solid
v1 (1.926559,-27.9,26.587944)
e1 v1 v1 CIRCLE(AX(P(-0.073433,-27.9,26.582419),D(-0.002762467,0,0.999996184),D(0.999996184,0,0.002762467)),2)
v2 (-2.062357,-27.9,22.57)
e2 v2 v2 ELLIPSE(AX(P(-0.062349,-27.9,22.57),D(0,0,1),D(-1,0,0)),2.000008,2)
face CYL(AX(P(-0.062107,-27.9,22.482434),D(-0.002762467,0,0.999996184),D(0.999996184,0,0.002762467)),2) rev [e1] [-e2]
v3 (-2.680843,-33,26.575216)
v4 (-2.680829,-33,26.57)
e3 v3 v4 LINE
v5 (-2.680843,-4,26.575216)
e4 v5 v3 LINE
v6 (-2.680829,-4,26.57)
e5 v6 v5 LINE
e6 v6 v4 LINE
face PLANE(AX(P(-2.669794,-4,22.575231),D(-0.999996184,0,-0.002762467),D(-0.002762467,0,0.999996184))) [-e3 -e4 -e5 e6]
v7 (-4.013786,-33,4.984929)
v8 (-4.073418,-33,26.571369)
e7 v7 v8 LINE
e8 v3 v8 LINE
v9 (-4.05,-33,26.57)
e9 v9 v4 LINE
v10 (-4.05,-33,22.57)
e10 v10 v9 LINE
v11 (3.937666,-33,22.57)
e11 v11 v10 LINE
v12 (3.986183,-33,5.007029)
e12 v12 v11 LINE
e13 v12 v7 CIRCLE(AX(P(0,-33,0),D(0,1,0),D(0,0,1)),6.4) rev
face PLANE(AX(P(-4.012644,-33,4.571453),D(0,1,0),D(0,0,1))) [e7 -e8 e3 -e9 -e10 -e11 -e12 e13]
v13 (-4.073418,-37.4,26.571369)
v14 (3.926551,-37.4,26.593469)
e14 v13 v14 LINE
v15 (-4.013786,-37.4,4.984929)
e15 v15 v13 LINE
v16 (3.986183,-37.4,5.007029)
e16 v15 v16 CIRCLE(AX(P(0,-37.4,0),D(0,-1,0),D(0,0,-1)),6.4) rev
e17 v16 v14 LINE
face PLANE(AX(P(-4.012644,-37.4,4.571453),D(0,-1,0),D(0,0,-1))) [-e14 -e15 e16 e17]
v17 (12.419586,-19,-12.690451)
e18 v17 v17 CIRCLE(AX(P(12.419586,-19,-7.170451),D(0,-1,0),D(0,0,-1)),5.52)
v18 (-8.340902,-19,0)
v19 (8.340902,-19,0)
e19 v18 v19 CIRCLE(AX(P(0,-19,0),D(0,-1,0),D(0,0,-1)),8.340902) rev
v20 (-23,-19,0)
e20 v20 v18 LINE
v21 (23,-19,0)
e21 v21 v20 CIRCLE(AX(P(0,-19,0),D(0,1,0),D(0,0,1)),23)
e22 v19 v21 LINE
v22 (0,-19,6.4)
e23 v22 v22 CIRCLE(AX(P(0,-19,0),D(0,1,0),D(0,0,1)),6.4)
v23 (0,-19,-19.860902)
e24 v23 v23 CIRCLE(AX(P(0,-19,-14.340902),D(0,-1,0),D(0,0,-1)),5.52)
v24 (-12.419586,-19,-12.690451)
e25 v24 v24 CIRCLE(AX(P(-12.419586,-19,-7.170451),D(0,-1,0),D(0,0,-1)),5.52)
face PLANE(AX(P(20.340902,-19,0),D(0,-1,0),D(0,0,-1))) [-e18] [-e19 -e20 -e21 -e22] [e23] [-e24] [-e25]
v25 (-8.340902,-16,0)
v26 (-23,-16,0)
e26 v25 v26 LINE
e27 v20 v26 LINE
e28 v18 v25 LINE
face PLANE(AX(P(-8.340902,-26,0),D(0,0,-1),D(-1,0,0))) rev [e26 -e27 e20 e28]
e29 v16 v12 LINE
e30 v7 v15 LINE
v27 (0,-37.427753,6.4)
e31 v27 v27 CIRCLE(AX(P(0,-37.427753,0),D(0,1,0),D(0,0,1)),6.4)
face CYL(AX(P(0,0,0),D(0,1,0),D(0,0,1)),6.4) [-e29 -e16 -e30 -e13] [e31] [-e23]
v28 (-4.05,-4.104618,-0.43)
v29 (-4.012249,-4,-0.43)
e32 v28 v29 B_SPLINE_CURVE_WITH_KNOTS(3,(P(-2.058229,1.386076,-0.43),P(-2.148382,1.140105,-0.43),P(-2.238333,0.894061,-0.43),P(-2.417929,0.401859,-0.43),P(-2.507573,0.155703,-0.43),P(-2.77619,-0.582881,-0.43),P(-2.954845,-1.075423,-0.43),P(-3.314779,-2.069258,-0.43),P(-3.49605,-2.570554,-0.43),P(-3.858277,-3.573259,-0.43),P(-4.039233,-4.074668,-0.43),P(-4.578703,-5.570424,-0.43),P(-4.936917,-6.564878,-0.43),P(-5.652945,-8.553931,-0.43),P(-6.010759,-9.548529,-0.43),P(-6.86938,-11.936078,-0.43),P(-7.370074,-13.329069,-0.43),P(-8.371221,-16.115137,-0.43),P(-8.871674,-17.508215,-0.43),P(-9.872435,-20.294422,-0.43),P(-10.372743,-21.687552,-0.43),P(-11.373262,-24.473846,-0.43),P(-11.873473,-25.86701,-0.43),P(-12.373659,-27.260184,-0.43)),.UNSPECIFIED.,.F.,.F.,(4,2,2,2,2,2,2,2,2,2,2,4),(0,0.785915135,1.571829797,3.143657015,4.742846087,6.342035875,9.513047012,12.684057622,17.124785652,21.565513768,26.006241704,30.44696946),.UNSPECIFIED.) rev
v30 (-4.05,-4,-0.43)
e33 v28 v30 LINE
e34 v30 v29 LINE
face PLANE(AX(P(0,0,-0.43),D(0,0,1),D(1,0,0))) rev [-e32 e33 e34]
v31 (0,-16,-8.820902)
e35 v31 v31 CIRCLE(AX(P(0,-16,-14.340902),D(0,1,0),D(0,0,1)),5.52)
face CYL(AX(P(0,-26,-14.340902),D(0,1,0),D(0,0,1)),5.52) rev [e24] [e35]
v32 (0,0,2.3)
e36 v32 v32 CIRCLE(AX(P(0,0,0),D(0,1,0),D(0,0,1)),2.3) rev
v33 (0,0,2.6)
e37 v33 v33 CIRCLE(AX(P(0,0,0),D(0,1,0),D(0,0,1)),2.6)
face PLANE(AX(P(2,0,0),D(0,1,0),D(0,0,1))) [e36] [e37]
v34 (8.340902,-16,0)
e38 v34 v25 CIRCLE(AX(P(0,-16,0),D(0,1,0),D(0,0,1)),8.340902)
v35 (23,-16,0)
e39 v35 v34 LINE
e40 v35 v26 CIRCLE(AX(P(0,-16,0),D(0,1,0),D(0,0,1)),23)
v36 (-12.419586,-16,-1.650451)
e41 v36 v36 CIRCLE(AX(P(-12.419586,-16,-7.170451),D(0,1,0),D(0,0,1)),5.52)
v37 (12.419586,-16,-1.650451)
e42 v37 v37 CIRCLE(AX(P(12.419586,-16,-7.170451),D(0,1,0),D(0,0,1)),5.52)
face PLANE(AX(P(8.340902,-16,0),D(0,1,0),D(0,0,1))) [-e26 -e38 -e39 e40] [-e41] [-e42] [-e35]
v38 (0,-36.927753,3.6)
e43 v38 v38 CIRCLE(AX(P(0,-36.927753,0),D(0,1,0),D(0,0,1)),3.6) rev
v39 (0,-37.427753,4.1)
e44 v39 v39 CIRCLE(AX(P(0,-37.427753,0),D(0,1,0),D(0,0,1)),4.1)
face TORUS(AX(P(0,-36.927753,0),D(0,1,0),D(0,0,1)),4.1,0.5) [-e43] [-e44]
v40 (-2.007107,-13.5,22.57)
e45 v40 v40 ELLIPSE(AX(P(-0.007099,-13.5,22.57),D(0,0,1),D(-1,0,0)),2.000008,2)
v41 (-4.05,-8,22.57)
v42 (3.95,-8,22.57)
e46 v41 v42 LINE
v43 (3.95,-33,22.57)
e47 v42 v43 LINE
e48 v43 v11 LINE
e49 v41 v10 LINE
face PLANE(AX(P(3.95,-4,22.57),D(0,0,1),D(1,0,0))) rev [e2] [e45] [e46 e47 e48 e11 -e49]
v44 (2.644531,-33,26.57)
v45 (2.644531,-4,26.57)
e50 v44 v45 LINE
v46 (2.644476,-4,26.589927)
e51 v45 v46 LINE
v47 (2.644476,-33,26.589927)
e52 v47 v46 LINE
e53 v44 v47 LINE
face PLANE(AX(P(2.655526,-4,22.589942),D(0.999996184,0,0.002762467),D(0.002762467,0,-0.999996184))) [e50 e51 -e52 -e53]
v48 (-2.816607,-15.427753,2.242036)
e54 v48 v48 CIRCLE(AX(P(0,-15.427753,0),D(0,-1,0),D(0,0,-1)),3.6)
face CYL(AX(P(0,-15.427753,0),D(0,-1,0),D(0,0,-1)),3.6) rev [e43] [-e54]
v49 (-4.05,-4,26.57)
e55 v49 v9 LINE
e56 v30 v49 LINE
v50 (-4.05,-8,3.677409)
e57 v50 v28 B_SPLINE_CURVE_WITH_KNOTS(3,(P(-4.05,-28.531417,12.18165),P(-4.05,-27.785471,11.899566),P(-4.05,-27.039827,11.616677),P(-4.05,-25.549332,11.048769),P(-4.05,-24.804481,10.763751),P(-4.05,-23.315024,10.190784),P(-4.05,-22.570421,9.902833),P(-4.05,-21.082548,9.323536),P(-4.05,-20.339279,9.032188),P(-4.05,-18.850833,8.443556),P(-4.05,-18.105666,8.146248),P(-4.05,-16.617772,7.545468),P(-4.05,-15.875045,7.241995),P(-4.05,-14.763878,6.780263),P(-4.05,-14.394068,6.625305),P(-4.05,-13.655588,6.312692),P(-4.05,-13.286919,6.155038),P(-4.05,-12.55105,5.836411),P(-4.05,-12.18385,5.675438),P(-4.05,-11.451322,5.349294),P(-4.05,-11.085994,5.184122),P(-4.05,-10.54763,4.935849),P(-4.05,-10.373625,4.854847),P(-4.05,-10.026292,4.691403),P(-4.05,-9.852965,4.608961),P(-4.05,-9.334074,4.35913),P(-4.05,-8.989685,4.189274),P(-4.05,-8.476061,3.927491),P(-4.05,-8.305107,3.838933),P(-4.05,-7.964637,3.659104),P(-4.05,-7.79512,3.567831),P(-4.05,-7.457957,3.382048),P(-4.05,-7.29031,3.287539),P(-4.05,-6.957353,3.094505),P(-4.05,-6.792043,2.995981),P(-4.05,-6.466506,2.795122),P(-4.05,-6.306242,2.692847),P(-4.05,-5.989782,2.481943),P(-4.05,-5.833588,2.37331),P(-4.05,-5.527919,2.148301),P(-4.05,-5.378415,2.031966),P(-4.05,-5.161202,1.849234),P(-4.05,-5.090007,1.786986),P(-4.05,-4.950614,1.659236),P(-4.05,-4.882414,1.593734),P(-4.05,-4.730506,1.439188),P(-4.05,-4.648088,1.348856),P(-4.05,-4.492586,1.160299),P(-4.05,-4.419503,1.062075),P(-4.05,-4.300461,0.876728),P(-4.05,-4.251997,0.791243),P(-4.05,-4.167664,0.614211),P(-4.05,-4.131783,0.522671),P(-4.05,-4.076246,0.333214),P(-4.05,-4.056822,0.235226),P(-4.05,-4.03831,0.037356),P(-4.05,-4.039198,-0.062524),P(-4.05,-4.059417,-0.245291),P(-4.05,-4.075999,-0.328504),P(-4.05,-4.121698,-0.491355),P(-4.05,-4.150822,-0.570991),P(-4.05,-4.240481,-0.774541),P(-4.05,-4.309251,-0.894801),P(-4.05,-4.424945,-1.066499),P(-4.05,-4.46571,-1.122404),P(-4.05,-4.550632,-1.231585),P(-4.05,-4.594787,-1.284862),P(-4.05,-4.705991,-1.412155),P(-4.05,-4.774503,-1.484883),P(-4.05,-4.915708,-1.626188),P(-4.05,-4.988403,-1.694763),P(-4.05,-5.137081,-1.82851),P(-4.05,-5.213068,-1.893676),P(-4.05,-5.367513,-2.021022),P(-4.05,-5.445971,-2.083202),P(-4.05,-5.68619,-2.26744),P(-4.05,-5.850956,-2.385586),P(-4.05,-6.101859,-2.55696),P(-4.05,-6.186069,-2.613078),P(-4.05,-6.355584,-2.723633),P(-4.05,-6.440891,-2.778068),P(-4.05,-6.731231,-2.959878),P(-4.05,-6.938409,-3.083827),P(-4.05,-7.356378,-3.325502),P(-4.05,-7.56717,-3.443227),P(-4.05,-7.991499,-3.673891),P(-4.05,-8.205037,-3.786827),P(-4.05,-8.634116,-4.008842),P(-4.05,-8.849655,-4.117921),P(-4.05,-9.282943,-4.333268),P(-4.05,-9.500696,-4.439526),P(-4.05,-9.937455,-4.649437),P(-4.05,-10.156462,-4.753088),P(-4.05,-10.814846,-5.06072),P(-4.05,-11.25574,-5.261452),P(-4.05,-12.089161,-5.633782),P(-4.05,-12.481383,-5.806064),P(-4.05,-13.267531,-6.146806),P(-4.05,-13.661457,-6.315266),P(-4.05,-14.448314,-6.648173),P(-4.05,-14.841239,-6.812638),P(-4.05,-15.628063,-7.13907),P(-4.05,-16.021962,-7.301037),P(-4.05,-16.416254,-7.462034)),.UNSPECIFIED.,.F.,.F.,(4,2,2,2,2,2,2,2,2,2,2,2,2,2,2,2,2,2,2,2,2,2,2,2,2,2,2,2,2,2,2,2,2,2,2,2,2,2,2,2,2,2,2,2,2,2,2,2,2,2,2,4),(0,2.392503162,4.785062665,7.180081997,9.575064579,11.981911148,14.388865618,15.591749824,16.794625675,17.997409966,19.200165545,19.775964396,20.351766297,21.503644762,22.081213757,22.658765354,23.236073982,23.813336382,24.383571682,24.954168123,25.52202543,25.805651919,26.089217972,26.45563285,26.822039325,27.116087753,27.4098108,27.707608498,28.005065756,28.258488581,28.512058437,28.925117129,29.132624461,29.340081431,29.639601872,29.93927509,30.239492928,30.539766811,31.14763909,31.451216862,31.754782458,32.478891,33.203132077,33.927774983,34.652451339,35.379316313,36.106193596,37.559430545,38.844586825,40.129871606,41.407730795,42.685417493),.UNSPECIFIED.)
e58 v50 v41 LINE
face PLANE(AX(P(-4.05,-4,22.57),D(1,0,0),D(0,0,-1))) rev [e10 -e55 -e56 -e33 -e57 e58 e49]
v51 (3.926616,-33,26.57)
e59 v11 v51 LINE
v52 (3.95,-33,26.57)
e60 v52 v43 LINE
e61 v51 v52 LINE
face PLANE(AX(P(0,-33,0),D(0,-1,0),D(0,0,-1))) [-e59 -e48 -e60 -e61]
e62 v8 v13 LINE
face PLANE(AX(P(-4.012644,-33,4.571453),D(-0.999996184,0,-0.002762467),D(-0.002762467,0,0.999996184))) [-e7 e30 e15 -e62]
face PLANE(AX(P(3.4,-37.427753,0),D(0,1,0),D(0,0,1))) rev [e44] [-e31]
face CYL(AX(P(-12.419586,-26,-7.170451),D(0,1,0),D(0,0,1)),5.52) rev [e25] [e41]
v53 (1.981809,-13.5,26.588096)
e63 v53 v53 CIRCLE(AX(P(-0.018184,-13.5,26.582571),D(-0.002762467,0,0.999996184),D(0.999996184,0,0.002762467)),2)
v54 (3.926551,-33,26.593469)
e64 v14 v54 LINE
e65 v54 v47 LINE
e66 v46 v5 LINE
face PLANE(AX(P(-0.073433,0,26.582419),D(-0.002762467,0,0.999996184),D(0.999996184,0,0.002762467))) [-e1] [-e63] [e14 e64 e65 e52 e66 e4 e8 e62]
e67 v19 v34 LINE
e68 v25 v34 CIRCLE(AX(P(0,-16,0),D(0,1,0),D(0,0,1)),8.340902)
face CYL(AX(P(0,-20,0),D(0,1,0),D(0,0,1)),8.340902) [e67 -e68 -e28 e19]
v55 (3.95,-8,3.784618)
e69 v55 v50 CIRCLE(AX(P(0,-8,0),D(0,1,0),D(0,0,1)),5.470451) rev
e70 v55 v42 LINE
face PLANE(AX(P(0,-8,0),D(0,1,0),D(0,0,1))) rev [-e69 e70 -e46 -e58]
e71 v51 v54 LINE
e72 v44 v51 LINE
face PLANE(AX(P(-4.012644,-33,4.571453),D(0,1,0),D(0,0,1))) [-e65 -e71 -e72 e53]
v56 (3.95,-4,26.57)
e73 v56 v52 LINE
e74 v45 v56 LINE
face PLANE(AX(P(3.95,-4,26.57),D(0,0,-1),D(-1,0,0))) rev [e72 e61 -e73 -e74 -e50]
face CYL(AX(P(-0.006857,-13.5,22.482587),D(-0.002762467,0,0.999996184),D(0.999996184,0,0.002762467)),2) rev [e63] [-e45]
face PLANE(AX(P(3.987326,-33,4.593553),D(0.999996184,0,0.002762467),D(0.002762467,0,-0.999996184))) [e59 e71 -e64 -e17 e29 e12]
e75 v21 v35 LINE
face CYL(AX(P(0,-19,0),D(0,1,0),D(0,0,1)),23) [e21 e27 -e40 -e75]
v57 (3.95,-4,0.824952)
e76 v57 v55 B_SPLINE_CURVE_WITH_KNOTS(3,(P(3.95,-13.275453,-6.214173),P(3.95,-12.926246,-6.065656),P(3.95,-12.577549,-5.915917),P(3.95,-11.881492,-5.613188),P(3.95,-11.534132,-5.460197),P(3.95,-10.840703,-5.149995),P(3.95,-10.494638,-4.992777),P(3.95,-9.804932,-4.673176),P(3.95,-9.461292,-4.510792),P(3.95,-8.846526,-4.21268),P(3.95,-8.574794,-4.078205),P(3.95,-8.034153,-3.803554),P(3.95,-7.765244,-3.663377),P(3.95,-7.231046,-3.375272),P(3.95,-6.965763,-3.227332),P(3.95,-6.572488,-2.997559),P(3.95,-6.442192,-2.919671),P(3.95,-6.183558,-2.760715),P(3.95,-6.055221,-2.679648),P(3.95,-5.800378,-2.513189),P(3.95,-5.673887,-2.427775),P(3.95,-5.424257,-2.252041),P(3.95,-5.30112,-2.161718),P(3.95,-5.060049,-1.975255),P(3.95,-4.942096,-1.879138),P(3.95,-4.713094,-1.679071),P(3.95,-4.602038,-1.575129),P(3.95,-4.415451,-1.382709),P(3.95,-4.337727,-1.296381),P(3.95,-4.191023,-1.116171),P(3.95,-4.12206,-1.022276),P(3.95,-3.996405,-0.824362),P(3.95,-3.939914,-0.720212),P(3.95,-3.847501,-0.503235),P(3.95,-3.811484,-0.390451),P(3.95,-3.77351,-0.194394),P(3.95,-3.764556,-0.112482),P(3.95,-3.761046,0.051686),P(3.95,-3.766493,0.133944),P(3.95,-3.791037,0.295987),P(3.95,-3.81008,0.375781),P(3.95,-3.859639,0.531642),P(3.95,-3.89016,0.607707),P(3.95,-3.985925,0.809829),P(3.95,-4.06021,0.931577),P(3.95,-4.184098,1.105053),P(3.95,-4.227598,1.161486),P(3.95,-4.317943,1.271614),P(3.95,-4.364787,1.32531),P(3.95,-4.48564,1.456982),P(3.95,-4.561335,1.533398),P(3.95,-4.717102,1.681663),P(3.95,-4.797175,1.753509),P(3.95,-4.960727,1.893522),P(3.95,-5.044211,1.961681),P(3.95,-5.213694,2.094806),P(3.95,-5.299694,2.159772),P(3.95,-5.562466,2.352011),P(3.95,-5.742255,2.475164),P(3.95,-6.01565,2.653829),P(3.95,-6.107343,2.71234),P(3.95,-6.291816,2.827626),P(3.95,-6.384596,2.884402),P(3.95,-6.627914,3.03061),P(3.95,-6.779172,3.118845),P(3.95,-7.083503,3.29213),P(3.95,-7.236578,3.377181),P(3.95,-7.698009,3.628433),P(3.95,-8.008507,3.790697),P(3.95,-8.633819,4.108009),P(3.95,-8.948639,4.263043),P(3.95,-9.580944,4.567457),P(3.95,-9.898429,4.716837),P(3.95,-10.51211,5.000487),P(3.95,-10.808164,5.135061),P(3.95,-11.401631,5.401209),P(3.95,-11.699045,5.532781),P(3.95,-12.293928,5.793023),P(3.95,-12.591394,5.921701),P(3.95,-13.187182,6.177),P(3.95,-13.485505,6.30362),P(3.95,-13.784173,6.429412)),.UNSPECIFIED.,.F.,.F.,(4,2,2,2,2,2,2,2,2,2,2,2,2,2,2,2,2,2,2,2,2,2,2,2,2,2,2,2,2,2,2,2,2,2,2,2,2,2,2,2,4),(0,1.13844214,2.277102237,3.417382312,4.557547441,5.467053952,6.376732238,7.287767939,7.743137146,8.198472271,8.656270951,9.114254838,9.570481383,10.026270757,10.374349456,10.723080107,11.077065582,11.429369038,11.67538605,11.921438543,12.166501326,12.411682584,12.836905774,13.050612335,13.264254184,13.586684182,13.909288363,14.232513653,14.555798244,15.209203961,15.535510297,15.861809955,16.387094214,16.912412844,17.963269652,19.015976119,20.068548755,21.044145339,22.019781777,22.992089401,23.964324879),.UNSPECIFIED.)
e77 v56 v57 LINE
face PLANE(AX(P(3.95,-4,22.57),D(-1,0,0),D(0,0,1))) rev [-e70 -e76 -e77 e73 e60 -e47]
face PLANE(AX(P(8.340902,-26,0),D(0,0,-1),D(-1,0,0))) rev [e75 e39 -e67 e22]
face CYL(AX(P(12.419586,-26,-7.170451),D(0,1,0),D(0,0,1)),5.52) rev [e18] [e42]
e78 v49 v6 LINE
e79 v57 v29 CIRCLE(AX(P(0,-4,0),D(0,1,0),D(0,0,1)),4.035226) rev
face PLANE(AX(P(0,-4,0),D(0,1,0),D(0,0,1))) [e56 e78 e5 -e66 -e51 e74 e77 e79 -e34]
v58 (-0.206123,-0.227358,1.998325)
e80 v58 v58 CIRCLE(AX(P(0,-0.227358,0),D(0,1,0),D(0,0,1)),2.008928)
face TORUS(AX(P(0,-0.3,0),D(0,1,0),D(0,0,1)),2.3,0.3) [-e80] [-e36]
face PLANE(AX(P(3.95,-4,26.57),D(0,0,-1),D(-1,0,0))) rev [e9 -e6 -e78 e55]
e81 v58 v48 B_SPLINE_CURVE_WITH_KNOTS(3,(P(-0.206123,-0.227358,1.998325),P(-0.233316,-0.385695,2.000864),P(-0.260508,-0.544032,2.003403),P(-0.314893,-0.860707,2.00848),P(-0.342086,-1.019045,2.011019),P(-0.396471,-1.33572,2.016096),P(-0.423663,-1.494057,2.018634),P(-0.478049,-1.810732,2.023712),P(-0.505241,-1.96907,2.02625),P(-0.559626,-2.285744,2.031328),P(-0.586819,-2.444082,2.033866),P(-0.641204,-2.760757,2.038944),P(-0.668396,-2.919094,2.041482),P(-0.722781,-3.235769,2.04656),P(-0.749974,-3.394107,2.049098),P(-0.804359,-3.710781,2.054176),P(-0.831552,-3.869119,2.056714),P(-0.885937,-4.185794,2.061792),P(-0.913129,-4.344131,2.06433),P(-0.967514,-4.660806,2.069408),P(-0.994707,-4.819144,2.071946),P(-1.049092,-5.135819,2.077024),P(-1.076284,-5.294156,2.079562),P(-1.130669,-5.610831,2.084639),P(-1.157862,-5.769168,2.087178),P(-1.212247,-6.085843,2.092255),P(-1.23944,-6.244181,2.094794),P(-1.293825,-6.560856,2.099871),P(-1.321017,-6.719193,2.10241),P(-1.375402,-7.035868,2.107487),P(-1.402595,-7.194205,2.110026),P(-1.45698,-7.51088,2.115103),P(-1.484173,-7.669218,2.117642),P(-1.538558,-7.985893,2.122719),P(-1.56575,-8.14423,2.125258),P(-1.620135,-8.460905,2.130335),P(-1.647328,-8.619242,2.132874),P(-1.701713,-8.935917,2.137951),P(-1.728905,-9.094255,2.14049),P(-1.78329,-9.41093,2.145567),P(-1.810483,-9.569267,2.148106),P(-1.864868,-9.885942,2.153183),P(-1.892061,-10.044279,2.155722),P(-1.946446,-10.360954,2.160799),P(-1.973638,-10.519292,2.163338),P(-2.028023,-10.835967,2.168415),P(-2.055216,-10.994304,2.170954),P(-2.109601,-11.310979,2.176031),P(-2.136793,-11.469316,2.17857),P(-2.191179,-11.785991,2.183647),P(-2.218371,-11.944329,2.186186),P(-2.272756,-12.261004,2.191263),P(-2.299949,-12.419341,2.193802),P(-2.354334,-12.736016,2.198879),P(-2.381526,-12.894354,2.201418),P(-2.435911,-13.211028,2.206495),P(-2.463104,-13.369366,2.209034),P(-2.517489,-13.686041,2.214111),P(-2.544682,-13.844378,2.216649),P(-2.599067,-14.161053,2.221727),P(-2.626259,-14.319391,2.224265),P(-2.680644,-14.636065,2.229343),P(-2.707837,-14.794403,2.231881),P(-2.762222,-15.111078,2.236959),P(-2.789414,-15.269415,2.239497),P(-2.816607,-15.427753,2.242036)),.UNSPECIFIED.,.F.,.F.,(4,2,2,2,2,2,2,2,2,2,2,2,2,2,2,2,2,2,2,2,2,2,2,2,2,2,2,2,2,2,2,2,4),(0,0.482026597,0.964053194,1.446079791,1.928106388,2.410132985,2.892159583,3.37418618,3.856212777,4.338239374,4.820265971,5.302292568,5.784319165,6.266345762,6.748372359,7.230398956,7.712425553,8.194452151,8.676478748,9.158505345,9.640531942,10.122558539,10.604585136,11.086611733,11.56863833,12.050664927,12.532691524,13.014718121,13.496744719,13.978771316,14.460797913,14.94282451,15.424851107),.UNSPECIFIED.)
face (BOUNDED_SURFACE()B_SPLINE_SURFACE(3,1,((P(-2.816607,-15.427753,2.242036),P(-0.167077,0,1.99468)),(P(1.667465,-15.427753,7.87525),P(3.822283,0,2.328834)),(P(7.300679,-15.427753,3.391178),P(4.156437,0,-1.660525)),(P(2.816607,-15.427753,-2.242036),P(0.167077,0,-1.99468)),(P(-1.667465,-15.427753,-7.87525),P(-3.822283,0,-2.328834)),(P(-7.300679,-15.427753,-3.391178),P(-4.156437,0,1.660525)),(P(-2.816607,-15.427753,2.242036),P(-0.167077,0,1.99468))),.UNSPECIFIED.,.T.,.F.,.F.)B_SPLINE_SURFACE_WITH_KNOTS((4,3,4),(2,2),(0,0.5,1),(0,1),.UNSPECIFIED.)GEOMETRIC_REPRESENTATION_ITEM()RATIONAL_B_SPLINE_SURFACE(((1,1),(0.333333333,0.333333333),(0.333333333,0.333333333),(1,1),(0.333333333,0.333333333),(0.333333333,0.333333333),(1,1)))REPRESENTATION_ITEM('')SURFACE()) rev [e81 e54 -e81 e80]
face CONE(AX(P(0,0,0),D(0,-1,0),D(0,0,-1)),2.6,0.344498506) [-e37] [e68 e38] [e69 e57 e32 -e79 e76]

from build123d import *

# Parameters (mm, degrees)
FILLET1_R                 = 0.3
CUT_EXTRUDE1_DEPTH        = 1
CUT_EXTRUDE1_DEPTH_BACK   = 22
SKETCH3_R                 = 3.6
FILLET2_R                 = 0.5
FILLET3_R                 = 0.5
SKETCH11_R                = 5.52
CUT_EXTRUDE3_DEPTH        = 10
CUT_EXTRUDE4_START        = -10
CUT_EXTRUDE4_DEPTH        = 10
BOSS_EXTRUDE1_START       = -3
BOSS_EXTRUDE1_DEPTH       = 3
BOSS_EXTRUDE4_START       = -3
BOSS_EXTRUDE4_DEPTH       = 3
CUT_EXTRUDE5_DEPTH        = 4
SKETCH22_W                = 4
SKETCH22_H                = 3
BOSS_EXTRUDE6_DEPTH       = 15
CUT_EXTRUDE6_START        = 21
SKETCH25_R                = 3.6
CUT_EXTRUDE6_DEPTH        = 21
BOSS_EXTRUDE7_DEPTH       = 3
BOSS_EXTRUDE7_DEPTH_BACK  = 0.5
SKETCH26_W                = 5
SKETCH26_H                = 24
SKETCH27_R                = 1.5
CUT_EXTRUDE8_DEPTH        = 3.5
CUT_EXTRUDE9_DEPTH        = 25
BOSS_EXTRUDE8_DEPTH       = 4
BOSS_EXTRUDE13_DEPTH      = 5.325316
BOSS_EXTRUDE14_DEPTH      = 2
BOSS_EXTRUDE14_DEPTH_BACK = 2
SKETCH44_W                = 5.325340097
SKETCH44_H                = 33.353922233
SKETCH45_W                = 8
SKETCH45_H                = 4.4
BOSS_EXTRUDE15_DEPTH      = 22
SKETCH47_W                = 8
SKETCH47_H                = 4
BOSS_EXTRUDE16_DEPTH      = 29
SKETCH48_W                = 8
SKETCH48_H                = 4
BOSS_EXTRUDE17_DEPTH      = 23
SKETCH52_R                = 2
CUT_EXTRUDE10_DEPTH       = 4.1


with BuildPart() as part:
    # Sketch2 → Revolve1 (revolve)
    with BuildSketch(Plane.XY, mode=Mode.PRIVATE) as revolve1_sk:
        Polygon((2, 0), (2.6, 0), (8.340902118, -16), (20.340902118, -16), (20.340902118, -19), (6.4, -19), (6.4, -37.427752697), (3.4, -37.427752697), (3.4, -16), (2, -16), align=None)
    revolve(revolve1_sk.sketch.rotate(Axis((0, 0, 0), (0, -1, 0)), 90), axis=Axis((0, 0, 0), (0, -1, 0)))

    # Fillet1
    fillet1_edges = [part.edges().sort_by_distance(p)[0] for p in [
        (0, 0, -2),
    ]]
    fillet(fillet1_edges, radius=FILLET1_R)

    # Sketch3 → Cut-Extrude1 (cut, two sides: drawn at the far end of the back side and taken through both)
    with BuildSketch(Plane.XZ.offset(37.427752697).offset(-CUT_EXTRUDE1_DEPTH_BACK)):
        with Locations(Location((0, 0, 0), (0, 0, 270))):
            Circle(SKETCH3_R)
    extrude(amount=CUT_EXTRUDE1_DEPTH + CUT_EXTRUDE1_DEPTH_BACK, mode=Mode.SUBTRACT)

    # Fillet2
    fillet2_edges = [part.edges().sort_by_distance(p)[0] for p in [
        (0, -15.427752697, -2),
    ]]
    fillet(fillet2_edges, radius=FILLET2_R)

    # Fillet3
    fillet3_edges = [part.edges().sort_by_distance(p)[0] for p in [
        (0, -37.427752697, 3.6),
    ]]
    fillet(fillet3_edges, radius=FILLET3_R)

    # Sketch5 → Cut-Loft2 section 0
    with BuildSketch(Plane(origin=(0, -16, 0), x_dir=(1, 0, 0), z_dir=(0, 1, 0))):
        with BuildLine():
            Line((-3.25, -14), (3.25, -14))
            Line((3.25, -14), (3.25, -16))
            Line((3.25, -16), (-3.25, -16))
            Line((-3.25, -16), (-3.25, -14))
        make_face()
    # Sketch6 → Cut-Loft2 section 1
    with BuildSketch(Plane.XZ.offset(19)):
        with BuildLine():
            Line((4.25, 14), (-4.25, 14))
            Line((-4.25, 14), (-4.25, 16))
            Line((-4.25, 16), (4.25, 16))
            Line((4.25, 16), (4.25, 14))
        make_face()
    loft(mode=Mode.SUBTRACT)

    # Sketch8 → Cut-Loft3 section 0
    with BuildSketch(Plane.XZ.offset(19)):
        with BuildLine():
            Line((4.25, 13.5), (-4.25, 13.5))
            Line((-4.25, 13.5), (-4.25, 16.5))
            Line((-4.25, 16.5), (4.25, 16.5))
            Line((4.25, 16.5), (4.25, 13.5))
        make_face()
    # Sketch7 → Cut-Loft3 section 1
    with BuildSketch(Plane(origin=(0, -16, 0), x_dir=(1, 0, 0), z_dir=(0, 1, 0))):
        with BuildLine():
            Line((-3.25, -13.5), (3.25, -13.5))
            Line((3.25, -13.5), (3.25, -16.5))
            Line((3.25, -16.5), (-3.25, -16.5))
            Line((-3.25, -16.5), (-3.25, -13.5))
        make_face()
    loft(mode=Mode.SUBTRACT)

    # Sketch11 → Cut-Extrude3 (cut)
    with BuildSketch(Plane(origin=(0, -16, 0), x_dir=(1, 0, 0), z_dir=(0, 1, 0))):
        with Locations(Location((0, 14.340902118, 0), (0, 0, 270))):
            Circle(SKETCH11_R)
        with Locations(Location((12.419585547, 7.170451059, 0), (0, 0, 270))):
            Circle(SKETCH11_R)
        with BuildLine():
            ThreePointArc((-17.200045776, 9.930451059), (-15.179585547, 2.38999083), (-7.639125318, 4.410451059))
            Line((-7.639125318, 4.410451059), (-12.419585547, 7.170451059))
            Line((-12.419585547, 7.170451059), (-17.200045776, 9.930451059))
        make_face()
        with BuildLine():
            Line((-12.419585547, 7.170451059), (-7.639125318, 4.410451059))
            ThreePointArc((-7.639125318, 4.410451059), (-7.087674986, 5.74176993), (-6.899585547, 7.170451059))
            ThreePointArc((-6.899585547, 7.170451059), (-10.990904418, 12.50236162), (-17.200045776, 9.930451059))
            Line((-17.200045776, 9.930451059), (-12.419585547, 7.170451059))
        make_face()
    extrude(amount=-CUT_EXTRUDE3_DEPTH, mode=Mode.SUBTRACT)

    # Sketch13 → Cut-Extrude4 (cut)
    with BuildSketch(Plane(origin=(0, -16, 0), x_dir=(1, 0, 0), z_dir=(0, 1, 0)).offset(CUT_EXTRUDE4_START)):
        with BuildLine():
            Line((-8.340902118, 0), (-20.340902118, 0))
            ThreePointArc((-20.340902118, 0), (-17.61573797, -10.170451059), (-10.170451059, -17.61573797))
            Line((-10.170451059, -17.61573797), (-4.170451059, -7.223433125))
            ThreePointArc((-4.170451059, -7.223433125), (-7.223433125, -4.170451059), (-8.340902118, 0))
        make_face()
        with BuildLine():
            Line((8.340902118, 0), (20.340902118, 0))
            ThreePointArc((20.340902118, 0), (17.546873261, -10.288806428), (9.932362997, -17.751069384))
            Line((9.932362997, -17.751069384), (4.072821701, -7.278926537))
            ThreePointArc((4.072821701, -7.278926537), (7.195194761, -4.218983349), (8.340902118, 0))
        make_face()
    extrude(amount=CUT_EXTRUDE4_DEPTH, mode=Mode.SUBTRACT)

    # Sketch14 → Boss-Extrude1 (add)
    with BuildSketch(Plane(origin=(0, -16, 0), x_dir=(1, 0, 0), z_dir=(0, 1, 0)).offset(BOSS_EXTRUDE1_START)):
        with BuildLine():
            ThreePointArc((0, 20.340902118), (14.383189823, 14.383189823), (20.340902118, 0))
            Line((20.340902118, 0), (23, 0))
            ThreePointArc((23, 0), (16.263455967, 16.263455967), (0, 23))
            Line((0, 23), (0, 20.340902118))
        make_face()
        with BuildLine():
            Line((-23, 0), (-20.340902118, 0))
            ThreePointArc((-20.340902118, 0), (-14.383189823, 14.383189823), (0, 20.340902118))
            Line((0, 20.340902118), (0, 23))
            ThreePointArc((0, 23), (-16.263455967, 16.263455967), (-23, 0))
        make_face()
    extrude(amount=BOSS_EXTRUDE1_DEPTH)

    # Sketch15 → Boss-Extrude4 (add)
    with BuildSketch(Plane(origin=(0, -16, 0), x_dir=(1, 0, 0), z_dir=(0, 1, 0)).offset(BOSS_EXTRUDE4_START)):
        with BuildLine():
            Line((-10.170451059, -17.61573797), (-8.340902118, 0))
            ThreePointArc((-8.340902118, 0), (0, -8.340902118), (8.340902118, 0))
            Line((8.340902118, 0), (9.932362997, -17.751069384))
            Line((9.932362997, -17.751069384), (0.261097866, -9.671265132))
            Line((0.261097866, -9.671265132), (-10.170451059, -17.61573797))
        make_face()
    extrude(amount=BOSS_EXTRUDE4_DEPTH)

    # Sketch21 → Cut-Extrude5 (cut)
    with BuildSketch(Plane(origin=(0, -16, 0), x_dir=(1, 0, 0), z_dir=(0, 1, 0))):
        with BuildLine():
            Line((8.340902118, 0), (11.037170737, -19.071811198))
            Line((11.037170737, -19.071811198), (-8.909760665, -24.214958869))
            Line((-8.909760665, -24.214958869), (-14.933909552, -10.991923284))
            Line((-14.933909552, -10.991923284), (-8.340902118, 0))
            ThreePointArc((-8.340902118, 0), (0, -8.340902118), (8.340902118, 0))
        make_face()
    extrude(amount=-CUT_EXTRUDE5_DEPTH, mode=Mode.SUBTRACT)

    # Sketch22 → Boss-Extrude6 (add)
    with BuildSketch(Plane.XY):
        with Locations((0, -17.5)):
            Rectangle(SKETCH22_W, SKETCH22_H)
    extrude(amount=BOSS_EXTRUDE6_DEPTH)

    # Sketch25 → Cut-Extrude6 (cut)
    with BuildSketch(Plane.XZ.offset(15.427752697).offset(CUT_EXTRUDE6_START)):
        with Locations(Location((0, 0, 0), (0, 0, 270))):
            Circle(SKETCH25_R)
    extrude(amount=-CUT_EXTRUDE6_DEPTH, mode=Mode.SUBTRACT)

    # Sketch26 → Boss-Extrude7 (add, two sides: drawn at the far end of the back side and taken through both)
    with BuildSketch(Plane.XY.offset(15).offset(-BOSS_EXTRUDE7_DEPTH_BACK)):
        with Locations((0, -28)):
            Rectangle(SKETCH26_W, SKETCH26_H)
    extrude(amount=BOSS_EXTRUDE7_DEPTH + BOSS_EXTRUDE7_DEPTH_BACK)

    # Sketch27 → Cut-Extrude8 (cut)
    with BuildSketch(Plane.XY.offset(18)):
        with Locations((0, -23)):
            Circle(SKETCH27_R)
        with Locations((0, -36)):
            Circle(SKETCH27_R)
    extrude(amount=-CUT_EXTRUDE8_DEPTH, mode=Mode.SUBTRACT)

    # Sketch28 → Cut-Extrude9 (cut)
    with BuildSketch(Plane(origin=(0, -16, 0), x_dir=(1, 0, 0), z_dir=(0, 1, 0))):
        with BuildLine():
            Line((-2, -8.097570509), (-5.786507294, -17.910682883))
            Line((-5.786507294, -17.910682883), (0.518098533, -20.020427682))
            Line((0.518098533, -20.020427682), (6.463906516, -17.731908852))
            Line((6.463906516, -17.731908852), (2, -8.097570509))
            ThreePointArc((2, -8.097570509), (0, -8.340902118), (-2, -8.097570509))
        make_face()
    extrude(amount=-CUT_EXTRUDE9_DEPTH, mode=Mode.SUBTRACT)

    # Sketch32 → Boss-Extrude8 (add)
    with BuildSketch(Plane(origin=(0, -8, 0), x_dir=(1, 0, 0), z_dir=(0, 1, 0))):
        with BuildLine():
            Line((2.65, -4.58993464), (2.65, -24.58993464))
            Line((2.65, -24.58993464), (-2.675318541, -24.575223569))
            Line((-2.675318541, -24.575223569), (-2.675318541, -4.575223569))
            ThreePointArc((-2.675318541, -4.575223569), (-1.400004277, -5.111749996), (-0.029282035, -5.299919109))
            ThreePointArc((-0.029282035, -5.299919109), (1.357593514, -5.123176734), (2.65, -4.58993464))
        make_face()
    extrude(amount=BOSS_EXTRUDE8_DEPTH)

    # Sketch41 → Boss-Extrude13 (add)
    with BuildSketch(Plane(origin=(2.65, 0, 0), x_dir=(0, 0, -1), z_dir=(1, 0, 0))):
        Polygon((-4.785742867, -8), (-6.72871788, -4), (-1.31380645, -4), (-1.671551647, -4.254674229), align=None)
    extrude(amount=-BOSS_EXTRUDE13_DEPTH)

    # Sketch44 → Boss-Extrude14 (add, two sides: drawn at the far end of the back side and taken through both)
    with BuildSketch(Plane(origin=(-0.067908393, 0, 24.58242648), x_dir=(0.9999961843816741, 0, 0.002762466668195937), z_dir=(-0.002762466668195937, 0, 0.9999961843816741)).offset(-BOSS_EXTRUDE14_DEPTH_BACK)):
        with Locations((0.055249952, -20.676961117)):
            Rectangle(SKETCH44_W, SKETCH44_H)
    extrude(amount=BOSS_EXTRUDE14_DEPTH + BOSS_EXTRUDE14_DEPTH_BACK)

    # Sketch45 → Boss-Extrude15 (add)
    with BuildSketch(Plane(origin=(-0.073433326, 0, 26.582418849), x_dir=(0.9999961843816741, 0, 0.002762466668195939), z_dir=(-0.002762466668195939, 0, 0.9999961843816741))):
        with Locations((0, -35.2)):
            Rectangle(SKETCH45_W, SKETCH45_H)
    extrude(amount=-BOSS_EXTRUDE15_DEPTH)

    # Sketch47 → Boss-Extrude16 (add)
    with BuildSketch(Plane(origin=(0, -33, 0), x_dir=(1, 0, 0), z_dir=(0, 1, 0))):
        with Locations((-0.05, -24.57)):
            Rectangle(SKETCH47_W, SKETCH47_H)
    extrude(amount=BOSS_EXTRUDE16_DEPTH)

    # Sketch48 → Boss-Extrude17 (add)
    with BuildSketch(Plane(origin=(0, 0, 22.57), x_dir=(-1, 0, 0), z_dir=(0, 0, -1))):
        with Locations((0.05, -6)):
            Rectangle(SKETCH48_W, SKETCH48_H)
    extrude(amount=BOSS_EXTRUDE17_DEPTH)

    # Cut-Loft5: read off the stored shape, not the designer's step
    # Cut-Loft5: loft between two sections, ruled curve by curve
    cut_loft5_from = [
        Edge.make_bspline([(-2.816606918, -15.427752697, 2.24203601), (1.667465101, -15.427752697, 7.875249846), (7.300678938, -15.427752697, 3.391177826), (2.816606918, -15.427752697, -2.24203601), (-1.667465101, -15.427752697, -7.875249846), (-7.300678938, -15.427752697, -3.391177826), (-2.816606918, -15.427752697, 2.24203601)], [0, 0, 0, 0, 0.5, 0.5, 0.5, 1, 1, 1, 1], 3, [1, 0.333333333, 0.333333333, 1, 0.333333333, 0.333333333, 1]),
    ]
    cut_loft5_to = [
        Edge.make_bspline([(-0.167077254, 0, 1.994679974), (3.822282693, 0, 2.328834482), (4.156437201, 0, -1.660525465), (0.167077254, 0, -1.994679974), (-3.822282693, 0, -2.328834482), (-4.156437201, 0, 1.660525465), (-0.167077254, 0, 1.994679974)], [0, 0, 0, 0, 0.5, 0.5, 0.5, 1, 1, 1, 1], 3, [1, 0.333333333, 0.333333333, 1, 0.333333333, 0.333333333, 1]),
    ]
    cut_loft5 = Solid(Shell([*[Face.make_surface_from_curves(cut_loft5_from[k], cut_loft5_to[k]) for k in range(1)], Face(Wire(cut_loft5_from)), Face(Wire(cut_loft5_to))]))
    add(cut_loft5, mode=Mode.SUBTRACT)

    # Sketch52 → Cut-Extrude10 (cut)
    with BuildSketch(Plane(origin=(-0.073433326, 0, 26.582418849), x_dir=(0.9999961843816741, 0, 0.002762466668195939), z_dir=(-0.002762466668195939, 0, 0.9999961843816741))):
        with Locations((0.055249952, -13.5)):
            Circle(SKETCH52_R)
        with Locations((0, -27.9)):
            Circle(SKETCH52_R)
    extrude(amount=-CUT_EXTRUDE10_DEPTH, mode=Mode.SUBTRACT)


solid = part.part
